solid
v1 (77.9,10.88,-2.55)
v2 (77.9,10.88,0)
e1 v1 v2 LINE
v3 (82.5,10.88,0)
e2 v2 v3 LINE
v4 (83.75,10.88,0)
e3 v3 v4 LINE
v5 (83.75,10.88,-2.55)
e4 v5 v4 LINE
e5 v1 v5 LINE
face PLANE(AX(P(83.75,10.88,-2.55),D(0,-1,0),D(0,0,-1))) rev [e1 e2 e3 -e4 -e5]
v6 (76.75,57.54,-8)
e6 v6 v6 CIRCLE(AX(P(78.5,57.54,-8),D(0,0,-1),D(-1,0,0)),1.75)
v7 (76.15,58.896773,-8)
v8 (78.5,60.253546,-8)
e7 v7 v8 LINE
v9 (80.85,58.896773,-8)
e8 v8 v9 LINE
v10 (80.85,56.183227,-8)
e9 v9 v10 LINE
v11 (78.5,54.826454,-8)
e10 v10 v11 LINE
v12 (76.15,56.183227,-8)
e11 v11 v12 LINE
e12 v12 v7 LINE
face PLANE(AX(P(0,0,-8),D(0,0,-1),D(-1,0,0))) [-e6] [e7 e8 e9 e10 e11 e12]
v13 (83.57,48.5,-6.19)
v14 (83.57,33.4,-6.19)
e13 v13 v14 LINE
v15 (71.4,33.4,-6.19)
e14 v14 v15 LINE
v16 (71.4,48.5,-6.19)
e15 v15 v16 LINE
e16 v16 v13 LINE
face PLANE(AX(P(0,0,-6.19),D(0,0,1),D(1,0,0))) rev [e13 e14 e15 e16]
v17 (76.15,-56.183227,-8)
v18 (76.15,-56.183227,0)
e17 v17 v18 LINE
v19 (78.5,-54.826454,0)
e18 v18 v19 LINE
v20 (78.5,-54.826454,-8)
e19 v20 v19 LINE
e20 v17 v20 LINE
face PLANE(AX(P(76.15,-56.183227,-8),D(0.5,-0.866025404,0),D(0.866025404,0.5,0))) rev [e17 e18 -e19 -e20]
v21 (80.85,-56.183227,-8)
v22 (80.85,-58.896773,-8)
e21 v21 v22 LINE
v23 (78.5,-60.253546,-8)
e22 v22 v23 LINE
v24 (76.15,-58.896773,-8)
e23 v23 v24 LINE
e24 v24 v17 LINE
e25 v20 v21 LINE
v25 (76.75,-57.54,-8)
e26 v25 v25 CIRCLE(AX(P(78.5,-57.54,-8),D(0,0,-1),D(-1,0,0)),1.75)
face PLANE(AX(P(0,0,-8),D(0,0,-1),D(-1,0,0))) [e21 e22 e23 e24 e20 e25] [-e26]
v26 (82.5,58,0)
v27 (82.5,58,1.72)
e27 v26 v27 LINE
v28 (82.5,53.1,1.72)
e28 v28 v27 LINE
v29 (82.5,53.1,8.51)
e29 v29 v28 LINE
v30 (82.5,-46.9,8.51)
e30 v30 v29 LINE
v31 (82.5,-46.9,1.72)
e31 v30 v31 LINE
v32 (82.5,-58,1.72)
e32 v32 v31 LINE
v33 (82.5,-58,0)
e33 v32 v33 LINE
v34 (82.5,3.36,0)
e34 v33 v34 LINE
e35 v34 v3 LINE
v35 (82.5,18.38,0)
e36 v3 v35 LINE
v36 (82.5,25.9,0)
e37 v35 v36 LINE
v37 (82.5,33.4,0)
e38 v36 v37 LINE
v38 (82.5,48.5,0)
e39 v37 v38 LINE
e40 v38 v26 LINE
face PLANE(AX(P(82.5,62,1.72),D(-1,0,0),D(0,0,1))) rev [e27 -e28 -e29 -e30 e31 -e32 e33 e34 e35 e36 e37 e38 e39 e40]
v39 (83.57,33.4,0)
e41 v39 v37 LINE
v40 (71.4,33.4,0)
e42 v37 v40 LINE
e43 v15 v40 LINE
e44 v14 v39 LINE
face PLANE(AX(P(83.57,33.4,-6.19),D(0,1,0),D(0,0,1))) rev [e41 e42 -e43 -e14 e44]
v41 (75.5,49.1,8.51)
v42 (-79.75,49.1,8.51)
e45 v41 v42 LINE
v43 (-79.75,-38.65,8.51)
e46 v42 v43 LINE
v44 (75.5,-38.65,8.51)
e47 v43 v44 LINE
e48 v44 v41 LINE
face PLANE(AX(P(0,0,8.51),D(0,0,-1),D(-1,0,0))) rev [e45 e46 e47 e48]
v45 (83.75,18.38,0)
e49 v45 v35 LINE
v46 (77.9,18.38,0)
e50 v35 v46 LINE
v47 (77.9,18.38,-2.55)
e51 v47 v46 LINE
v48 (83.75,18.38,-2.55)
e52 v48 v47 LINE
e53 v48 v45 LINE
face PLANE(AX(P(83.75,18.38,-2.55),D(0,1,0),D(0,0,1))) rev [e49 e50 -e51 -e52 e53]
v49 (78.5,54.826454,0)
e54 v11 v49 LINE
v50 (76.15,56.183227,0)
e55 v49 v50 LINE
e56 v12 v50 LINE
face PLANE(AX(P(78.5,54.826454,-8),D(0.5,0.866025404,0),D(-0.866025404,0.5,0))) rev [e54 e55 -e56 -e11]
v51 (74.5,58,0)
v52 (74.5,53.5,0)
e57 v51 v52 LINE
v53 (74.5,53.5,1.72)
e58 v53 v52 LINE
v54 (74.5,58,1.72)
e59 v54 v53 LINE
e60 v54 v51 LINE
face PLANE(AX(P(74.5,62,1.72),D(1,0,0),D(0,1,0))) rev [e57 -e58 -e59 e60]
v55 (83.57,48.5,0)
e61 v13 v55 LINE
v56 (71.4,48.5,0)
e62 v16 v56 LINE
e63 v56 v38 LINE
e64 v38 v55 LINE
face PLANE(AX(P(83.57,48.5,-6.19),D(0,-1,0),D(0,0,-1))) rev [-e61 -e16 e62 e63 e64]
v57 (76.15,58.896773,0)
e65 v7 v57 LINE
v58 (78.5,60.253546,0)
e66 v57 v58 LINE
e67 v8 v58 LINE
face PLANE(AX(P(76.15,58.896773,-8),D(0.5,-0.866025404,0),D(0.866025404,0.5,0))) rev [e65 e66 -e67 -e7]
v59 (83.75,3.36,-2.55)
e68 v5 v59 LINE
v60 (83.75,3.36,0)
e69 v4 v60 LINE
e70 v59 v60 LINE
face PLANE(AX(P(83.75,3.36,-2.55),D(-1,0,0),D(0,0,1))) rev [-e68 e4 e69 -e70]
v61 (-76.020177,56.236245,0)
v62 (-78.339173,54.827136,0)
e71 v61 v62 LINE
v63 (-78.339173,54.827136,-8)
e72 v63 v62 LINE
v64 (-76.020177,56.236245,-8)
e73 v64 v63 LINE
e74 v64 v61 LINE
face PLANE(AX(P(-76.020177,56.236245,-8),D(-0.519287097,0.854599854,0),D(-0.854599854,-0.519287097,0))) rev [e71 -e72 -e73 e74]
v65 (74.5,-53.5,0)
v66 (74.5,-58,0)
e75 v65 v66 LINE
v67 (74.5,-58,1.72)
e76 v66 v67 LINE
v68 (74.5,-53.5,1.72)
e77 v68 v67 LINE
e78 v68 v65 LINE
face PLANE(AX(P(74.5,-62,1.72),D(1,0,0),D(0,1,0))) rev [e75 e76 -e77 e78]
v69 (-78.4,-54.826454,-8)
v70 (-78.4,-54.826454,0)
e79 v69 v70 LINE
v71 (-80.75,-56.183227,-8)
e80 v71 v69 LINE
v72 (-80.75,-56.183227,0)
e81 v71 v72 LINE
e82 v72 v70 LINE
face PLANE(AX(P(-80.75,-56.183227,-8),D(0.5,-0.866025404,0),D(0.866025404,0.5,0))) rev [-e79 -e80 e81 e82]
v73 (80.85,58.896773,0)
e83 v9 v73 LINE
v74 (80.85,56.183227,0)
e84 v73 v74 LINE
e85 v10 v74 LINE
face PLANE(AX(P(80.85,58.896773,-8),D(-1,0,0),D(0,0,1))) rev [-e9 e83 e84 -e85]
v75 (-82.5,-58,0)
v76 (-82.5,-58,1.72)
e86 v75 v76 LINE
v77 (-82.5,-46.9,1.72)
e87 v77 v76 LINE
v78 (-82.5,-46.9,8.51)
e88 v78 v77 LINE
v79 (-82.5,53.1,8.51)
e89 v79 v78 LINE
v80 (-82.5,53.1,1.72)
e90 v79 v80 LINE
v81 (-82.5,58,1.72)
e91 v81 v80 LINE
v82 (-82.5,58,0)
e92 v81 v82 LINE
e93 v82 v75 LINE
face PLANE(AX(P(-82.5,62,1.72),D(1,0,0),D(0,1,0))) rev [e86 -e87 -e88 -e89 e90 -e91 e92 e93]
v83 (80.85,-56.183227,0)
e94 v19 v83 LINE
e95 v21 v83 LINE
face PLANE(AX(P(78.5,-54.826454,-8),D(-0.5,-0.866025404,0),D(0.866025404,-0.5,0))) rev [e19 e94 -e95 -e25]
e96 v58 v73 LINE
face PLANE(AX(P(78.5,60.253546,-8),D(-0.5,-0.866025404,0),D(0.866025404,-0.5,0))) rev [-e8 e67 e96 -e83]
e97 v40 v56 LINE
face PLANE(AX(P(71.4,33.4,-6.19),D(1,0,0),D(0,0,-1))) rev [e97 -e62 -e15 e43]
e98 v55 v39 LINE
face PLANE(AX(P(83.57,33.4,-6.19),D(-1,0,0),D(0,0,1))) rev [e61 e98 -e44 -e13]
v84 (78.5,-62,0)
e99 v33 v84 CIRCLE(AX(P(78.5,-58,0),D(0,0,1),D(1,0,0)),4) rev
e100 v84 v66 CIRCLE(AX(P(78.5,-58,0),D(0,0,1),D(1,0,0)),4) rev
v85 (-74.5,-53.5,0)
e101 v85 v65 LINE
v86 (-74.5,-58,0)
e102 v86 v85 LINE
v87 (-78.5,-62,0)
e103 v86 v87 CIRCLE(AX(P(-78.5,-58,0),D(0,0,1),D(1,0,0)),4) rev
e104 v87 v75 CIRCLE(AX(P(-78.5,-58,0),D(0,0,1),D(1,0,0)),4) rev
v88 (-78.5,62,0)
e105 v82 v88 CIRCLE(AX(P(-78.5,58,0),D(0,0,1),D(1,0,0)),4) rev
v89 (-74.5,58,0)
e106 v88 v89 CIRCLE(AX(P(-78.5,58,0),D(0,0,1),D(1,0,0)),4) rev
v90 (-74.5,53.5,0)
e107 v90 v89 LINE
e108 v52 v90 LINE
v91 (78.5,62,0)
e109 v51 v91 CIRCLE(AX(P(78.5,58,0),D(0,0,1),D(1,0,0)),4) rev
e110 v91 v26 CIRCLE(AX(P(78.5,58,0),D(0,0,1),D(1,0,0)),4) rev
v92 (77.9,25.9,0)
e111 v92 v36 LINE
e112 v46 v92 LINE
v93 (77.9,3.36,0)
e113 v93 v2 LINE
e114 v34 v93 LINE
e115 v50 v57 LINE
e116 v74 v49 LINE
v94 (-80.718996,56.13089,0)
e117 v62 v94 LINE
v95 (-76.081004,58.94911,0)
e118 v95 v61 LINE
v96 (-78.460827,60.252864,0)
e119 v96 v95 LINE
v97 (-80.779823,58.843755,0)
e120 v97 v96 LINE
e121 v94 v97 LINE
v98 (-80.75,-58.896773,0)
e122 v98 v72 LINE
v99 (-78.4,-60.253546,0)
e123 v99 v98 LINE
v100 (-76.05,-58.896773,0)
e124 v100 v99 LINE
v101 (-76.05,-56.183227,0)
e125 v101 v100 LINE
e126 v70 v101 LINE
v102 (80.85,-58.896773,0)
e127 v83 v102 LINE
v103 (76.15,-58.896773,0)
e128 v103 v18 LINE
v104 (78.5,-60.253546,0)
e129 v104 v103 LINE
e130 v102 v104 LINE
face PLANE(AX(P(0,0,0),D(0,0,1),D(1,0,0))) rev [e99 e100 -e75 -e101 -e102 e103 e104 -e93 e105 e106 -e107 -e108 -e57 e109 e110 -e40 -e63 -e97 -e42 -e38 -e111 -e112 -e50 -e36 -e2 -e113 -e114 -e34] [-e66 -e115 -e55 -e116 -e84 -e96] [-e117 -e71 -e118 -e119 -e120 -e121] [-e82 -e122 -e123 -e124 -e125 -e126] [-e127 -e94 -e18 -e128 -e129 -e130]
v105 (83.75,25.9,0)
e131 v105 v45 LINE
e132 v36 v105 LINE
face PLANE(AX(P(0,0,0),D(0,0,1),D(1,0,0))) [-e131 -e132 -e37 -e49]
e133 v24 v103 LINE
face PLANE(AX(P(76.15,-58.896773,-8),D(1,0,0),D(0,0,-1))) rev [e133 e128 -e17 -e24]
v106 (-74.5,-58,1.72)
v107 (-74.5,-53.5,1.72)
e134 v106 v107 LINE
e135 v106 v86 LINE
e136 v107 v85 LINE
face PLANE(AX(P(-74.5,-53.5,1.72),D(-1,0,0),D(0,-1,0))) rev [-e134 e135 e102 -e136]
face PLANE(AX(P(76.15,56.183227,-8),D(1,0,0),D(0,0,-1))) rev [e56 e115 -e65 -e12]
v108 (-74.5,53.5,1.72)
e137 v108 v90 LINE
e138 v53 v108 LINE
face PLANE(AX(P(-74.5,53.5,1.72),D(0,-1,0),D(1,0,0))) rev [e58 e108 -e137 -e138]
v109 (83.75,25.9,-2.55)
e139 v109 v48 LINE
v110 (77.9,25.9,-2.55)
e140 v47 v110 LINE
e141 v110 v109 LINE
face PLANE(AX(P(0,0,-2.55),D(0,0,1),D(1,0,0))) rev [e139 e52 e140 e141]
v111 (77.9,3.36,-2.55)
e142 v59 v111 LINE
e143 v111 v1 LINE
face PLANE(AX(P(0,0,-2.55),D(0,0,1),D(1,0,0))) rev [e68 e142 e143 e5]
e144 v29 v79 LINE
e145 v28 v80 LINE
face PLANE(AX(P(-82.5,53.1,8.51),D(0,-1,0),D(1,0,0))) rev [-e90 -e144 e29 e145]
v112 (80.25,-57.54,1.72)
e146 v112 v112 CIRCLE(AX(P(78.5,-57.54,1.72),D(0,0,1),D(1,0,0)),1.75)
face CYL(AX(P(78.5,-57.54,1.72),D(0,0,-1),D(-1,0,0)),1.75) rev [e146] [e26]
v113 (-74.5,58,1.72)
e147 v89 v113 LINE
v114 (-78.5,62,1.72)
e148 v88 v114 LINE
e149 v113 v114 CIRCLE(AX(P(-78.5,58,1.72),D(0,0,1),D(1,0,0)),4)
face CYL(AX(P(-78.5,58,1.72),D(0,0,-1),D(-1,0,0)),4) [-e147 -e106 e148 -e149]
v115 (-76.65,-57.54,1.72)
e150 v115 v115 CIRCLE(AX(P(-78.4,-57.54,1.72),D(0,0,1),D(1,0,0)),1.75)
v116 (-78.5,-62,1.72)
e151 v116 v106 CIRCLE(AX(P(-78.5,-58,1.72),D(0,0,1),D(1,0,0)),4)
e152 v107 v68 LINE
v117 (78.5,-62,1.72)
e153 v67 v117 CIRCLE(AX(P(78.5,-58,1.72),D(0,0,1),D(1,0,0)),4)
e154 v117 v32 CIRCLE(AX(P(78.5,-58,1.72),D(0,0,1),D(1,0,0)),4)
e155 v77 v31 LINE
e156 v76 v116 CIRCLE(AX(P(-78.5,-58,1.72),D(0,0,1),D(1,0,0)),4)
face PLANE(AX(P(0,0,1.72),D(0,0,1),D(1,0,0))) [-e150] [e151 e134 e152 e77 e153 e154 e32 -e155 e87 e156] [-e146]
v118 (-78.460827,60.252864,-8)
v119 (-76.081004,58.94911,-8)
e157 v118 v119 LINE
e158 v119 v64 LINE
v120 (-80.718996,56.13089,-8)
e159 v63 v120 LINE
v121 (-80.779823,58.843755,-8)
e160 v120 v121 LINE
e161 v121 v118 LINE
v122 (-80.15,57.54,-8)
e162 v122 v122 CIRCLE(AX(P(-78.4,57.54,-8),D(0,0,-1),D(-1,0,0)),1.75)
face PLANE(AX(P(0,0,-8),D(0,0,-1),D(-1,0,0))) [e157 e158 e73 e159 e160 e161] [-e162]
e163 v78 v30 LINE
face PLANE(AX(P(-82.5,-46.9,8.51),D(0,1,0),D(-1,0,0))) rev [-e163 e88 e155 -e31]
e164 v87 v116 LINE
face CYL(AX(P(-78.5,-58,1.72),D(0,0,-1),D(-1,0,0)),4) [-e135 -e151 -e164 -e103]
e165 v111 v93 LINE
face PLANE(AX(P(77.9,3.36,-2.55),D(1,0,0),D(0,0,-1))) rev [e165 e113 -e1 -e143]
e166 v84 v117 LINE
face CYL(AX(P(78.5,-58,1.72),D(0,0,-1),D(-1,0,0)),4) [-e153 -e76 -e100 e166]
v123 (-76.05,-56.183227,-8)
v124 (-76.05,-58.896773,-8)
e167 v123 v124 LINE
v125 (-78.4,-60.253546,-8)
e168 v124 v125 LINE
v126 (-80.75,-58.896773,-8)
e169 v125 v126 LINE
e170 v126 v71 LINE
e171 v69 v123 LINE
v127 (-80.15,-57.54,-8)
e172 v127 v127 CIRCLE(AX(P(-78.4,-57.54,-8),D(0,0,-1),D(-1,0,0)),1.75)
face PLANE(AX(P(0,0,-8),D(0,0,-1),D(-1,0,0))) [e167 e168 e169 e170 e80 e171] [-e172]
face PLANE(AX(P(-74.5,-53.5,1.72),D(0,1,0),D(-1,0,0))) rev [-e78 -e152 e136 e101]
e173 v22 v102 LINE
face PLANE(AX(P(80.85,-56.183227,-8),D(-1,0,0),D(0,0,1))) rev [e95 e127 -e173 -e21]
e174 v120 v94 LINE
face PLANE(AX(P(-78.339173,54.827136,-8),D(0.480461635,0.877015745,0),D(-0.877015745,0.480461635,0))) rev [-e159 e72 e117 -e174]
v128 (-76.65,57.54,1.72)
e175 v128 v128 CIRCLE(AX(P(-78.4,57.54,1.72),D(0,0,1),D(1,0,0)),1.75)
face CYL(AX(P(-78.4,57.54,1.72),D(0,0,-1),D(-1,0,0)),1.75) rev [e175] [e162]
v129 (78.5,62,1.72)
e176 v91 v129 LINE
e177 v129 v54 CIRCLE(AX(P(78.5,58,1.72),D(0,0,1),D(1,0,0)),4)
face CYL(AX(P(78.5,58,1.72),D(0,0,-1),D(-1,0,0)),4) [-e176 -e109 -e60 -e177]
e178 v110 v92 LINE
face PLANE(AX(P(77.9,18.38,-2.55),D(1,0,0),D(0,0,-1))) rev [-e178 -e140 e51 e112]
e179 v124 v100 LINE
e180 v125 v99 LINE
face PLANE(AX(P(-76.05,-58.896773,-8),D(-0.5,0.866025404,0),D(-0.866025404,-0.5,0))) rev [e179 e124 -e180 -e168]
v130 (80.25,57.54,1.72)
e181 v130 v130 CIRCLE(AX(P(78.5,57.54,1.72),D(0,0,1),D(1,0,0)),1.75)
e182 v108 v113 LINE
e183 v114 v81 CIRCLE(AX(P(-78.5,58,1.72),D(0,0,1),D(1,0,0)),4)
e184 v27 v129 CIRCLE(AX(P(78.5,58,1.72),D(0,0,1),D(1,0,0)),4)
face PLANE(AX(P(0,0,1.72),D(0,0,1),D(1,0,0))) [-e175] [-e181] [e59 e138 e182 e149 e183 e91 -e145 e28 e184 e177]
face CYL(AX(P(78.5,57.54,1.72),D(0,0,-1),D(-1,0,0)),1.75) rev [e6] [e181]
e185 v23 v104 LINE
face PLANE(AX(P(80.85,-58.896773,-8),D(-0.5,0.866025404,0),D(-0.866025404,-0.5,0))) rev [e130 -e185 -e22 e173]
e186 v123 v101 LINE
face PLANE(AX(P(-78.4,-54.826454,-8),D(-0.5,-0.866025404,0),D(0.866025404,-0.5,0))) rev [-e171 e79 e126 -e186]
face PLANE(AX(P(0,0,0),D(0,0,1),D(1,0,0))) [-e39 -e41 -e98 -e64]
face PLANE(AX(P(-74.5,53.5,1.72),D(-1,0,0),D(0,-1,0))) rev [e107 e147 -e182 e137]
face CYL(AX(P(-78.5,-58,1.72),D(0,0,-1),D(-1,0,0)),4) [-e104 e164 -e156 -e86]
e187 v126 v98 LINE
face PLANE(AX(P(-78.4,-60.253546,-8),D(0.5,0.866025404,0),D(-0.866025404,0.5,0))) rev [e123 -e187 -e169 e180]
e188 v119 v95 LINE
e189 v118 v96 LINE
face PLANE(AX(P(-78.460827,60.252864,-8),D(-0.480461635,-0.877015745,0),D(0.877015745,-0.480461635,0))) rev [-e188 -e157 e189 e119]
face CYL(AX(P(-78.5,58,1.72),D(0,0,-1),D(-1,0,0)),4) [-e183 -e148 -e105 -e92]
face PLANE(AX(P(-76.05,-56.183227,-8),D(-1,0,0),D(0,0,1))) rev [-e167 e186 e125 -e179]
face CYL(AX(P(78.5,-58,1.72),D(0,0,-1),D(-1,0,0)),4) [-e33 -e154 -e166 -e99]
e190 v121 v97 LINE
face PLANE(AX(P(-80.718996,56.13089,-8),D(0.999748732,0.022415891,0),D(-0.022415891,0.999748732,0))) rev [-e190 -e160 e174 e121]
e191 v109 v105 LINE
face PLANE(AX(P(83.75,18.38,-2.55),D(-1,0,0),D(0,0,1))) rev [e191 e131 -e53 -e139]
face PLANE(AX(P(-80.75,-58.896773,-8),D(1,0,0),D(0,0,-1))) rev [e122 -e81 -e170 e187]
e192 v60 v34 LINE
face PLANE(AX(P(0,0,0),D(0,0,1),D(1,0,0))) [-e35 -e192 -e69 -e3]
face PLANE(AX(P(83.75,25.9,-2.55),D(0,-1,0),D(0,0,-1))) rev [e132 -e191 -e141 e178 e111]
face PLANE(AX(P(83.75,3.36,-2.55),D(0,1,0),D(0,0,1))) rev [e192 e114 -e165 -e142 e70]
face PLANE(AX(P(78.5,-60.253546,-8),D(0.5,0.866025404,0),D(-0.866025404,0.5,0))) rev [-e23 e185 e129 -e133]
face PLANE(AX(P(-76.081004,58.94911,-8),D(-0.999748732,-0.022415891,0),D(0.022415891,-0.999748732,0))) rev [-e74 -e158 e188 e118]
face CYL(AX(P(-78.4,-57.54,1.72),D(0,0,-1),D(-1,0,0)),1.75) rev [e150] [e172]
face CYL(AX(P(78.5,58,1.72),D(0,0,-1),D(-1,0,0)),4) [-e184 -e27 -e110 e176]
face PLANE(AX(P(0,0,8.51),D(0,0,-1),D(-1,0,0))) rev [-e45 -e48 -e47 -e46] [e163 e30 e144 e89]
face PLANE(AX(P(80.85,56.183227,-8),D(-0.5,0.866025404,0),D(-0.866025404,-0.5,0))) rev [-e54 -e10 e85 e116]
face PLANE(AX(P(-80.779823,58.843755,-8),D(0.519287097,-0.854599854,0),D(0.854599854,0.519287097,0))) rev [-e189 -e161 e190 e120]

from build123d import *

# Parameters (mm, degrees)
ESQUISSE1_R        = 1.75
BOSS_EXTRU_1_DEPTH = 1.72
CONG_1_R           = 4
ESQUISSE2_W        = 165
ESQUISSE2_H        = 100
BOSS_EXTRU_2_DEPTH = 6.79
ESQUISSE3_W        = 12.17
ESQUISSE3_H        = 15.1
BOSS_EXTRU_3_DEPTH = 6.19
ESQUISSE4_W        = 5.85
ESQUISSE4_H        = 7.52
BOSS_EXTRU_4_DEPTH = 2.55
BOSS_EXTRU_5_START = 8
ESQUISSE5_R        = 1.75
BOSS_EXTRU_5_DEPTH = 8


with BuildPart() as part:
    # Esquisse1 → Boss.-Extru.1 (new body)
    with BuildSketch(Plane.XY):
        Polygon((-74.5, 53.5), (74.5, 53.5), (74.5, 62), (82.5, 62), (82.5, -62), (74.5, -62), (74.5, -53.5), (-74.5, -53.5), (-74.5, -62), (-82.5, -62), (-82.5, 62), (-74.5, 62), align=None)
        with Locations((78.5, 57.54)):
            Circle(ESQUISSE1_R, mode=Mode.SUBTRACT)
        with Locations((-78.4, 57.54)):
            Circle(ESQUISSE1_R, mode=Mode.SUBTRACT)
        with Locations((-78.4, -57.54)):
            Circle(ESQUISSE1_R, mode=Mode.SUBTRACT)
        with Locations((78.5, -57.54)):
            Circle(ESQUISSE1_R, mode=Mode.SUBTRACT)
    extrude(amount=BOSS_EXTRU_1_DEPTH)

    # Congé1
    cong_1_edges = [part.edges().sort_by_distance(p)[0] for p in [
        (74.5, -62, 0.86),
        (82.5, -62, 0.86),
        (82.5, 62, 0.86),
        (74.5, 62, 0.86),
        (-74.5, 62, 0.86),
        (-82.5, 62, 0.86),
        (-82.5, -62, 0.86),
        (-74.5, -62, 0.86),
    ]]
    fillet(cong_1_edges, radius=CONG_1_R - 0.0001)  # a hair under: the kernel refuses the full size

    # Esquisse2 → Boss.-Extru.2 (add)
    with BuildSketch(Plane.XY.offset(1.72)):
        with Locations((0, 3.1)):
            Rectangle(ESQUISSE2_W, ESQUISSE2_H)
    extrude(amount=BOSS_EXTRU_2_DEPTH)

    # Esquisse3 → Boss.-Extru.3 (add)
    with BuildSketch(Plane(origin=(0, 0, 0), x_dir=(-1, 0, 0), z_dir=(0, 0, -1))):
        with Locations((-77.485, 40.95)):
            Rectangle(ESQUISSE3_W, ESQUISSE3_H)
    extrude(amount=BOSS_EXTRU_3_DEPTH)

    # Esquisse4 → Boss.-Extru.4 (add)
    with BuildSketch(Plane(origin=(0, 0, 0), x_dir=(-1, 0, 0), z_dir=(0, 0, -1))):
        with Locations((-80.825, 22.14)):
            Rectangle(ESQUISSE4_W, ESQUISSE4_H)
        with Locations((-80.825, 7.12)):
            Rectangle(ESQUISSE4_W, ESQUISSE4_H)
    extrude(amount=BOSS_EXTRU_4_DEPTH)

    # Esquisse5 → Boss.-Extru.5 (add)
    # profile 1 of 4: a face of its own
    with BuildSketch(Plane(origin=(0, 0, 0), x_dir=(-1, 0, 0), z_dir=(0, 0, -1)).offset(BOSS_EXTRU_5_START)):
        Polygon((-78.5, -54.826453735), (-80.85, -56.183226867), (-80.85, -58.896773133), (-78.5, -60.253546265), (-76.15, -58.896773133), (-76.15, -56.183226867), align=None)
        with Locations((-78.5, -57.54)):
            Circle(ESQUISSE5_R, mode=Mode.SUBTRACT)
    # profile 2 of 4: a face of its own
    with BuildSketch(Plane(origin=(0, 0, 0), x_dir=(-1, 0, 0), z_dir=(0, 0, -1)).offset(BOSS_EXTRU_5_START)):
        Polygon((-78.5, 60.253546265), (-80.85, 58.896773133), (-80.85, 56.183226867), (-78.5, 54.826453735), (-76.15, 56.183226867), (-76.15, 58.896773133), align=None)
        with Locations((-78.5, 57.54)):
            Circle(ESQUISSE5_R, mode=Mode.SUBTRACT)
    # profile 3 of 4: a face of its own
    with BuildSketch(Plane(origin=(0, 0, 0), x_dir=(-1, 0, 0), z_dir=(0, 0, -1)).offset(BOSS_EXTRU_5_START)):
        Polygon((78.460826557, 60.252864439), (76.081003757, 58.949109563), (76.020177201, 56.236245124), (78.339173443, 54.827135561), (80.718996243, 56.130890437), (80.779822799, 58.843754876), align=None)
        with Locations((78.4, 57.54)):
            Circle(ESQUISSE5_R, mode=Mode.SUBTRACT)
    # profile 4 of 4: a face of its own
    with BuildSketch(Plane(origin=(0, 0, 0), x_dir=(-1, 0, 0), z_dir=(0, 0, -1)).offset(BOSS_EXTRU_5_START)):
        Polygon((78.4, -54.826453735), (76.05, -56.183226867), (76.05, -58.896773133), (78.4, -60.253546265), (80.75, -58.896773133), (80.75, -56.183226867), align=None)
        with Locations((78.4, -57.54)):
            Circle(ESQUISSE5_R, mode=Mode.SUBTRACT)
    extrude(amount=-BOSS_EXTRU_5_DEPTH)


solid = part.part
